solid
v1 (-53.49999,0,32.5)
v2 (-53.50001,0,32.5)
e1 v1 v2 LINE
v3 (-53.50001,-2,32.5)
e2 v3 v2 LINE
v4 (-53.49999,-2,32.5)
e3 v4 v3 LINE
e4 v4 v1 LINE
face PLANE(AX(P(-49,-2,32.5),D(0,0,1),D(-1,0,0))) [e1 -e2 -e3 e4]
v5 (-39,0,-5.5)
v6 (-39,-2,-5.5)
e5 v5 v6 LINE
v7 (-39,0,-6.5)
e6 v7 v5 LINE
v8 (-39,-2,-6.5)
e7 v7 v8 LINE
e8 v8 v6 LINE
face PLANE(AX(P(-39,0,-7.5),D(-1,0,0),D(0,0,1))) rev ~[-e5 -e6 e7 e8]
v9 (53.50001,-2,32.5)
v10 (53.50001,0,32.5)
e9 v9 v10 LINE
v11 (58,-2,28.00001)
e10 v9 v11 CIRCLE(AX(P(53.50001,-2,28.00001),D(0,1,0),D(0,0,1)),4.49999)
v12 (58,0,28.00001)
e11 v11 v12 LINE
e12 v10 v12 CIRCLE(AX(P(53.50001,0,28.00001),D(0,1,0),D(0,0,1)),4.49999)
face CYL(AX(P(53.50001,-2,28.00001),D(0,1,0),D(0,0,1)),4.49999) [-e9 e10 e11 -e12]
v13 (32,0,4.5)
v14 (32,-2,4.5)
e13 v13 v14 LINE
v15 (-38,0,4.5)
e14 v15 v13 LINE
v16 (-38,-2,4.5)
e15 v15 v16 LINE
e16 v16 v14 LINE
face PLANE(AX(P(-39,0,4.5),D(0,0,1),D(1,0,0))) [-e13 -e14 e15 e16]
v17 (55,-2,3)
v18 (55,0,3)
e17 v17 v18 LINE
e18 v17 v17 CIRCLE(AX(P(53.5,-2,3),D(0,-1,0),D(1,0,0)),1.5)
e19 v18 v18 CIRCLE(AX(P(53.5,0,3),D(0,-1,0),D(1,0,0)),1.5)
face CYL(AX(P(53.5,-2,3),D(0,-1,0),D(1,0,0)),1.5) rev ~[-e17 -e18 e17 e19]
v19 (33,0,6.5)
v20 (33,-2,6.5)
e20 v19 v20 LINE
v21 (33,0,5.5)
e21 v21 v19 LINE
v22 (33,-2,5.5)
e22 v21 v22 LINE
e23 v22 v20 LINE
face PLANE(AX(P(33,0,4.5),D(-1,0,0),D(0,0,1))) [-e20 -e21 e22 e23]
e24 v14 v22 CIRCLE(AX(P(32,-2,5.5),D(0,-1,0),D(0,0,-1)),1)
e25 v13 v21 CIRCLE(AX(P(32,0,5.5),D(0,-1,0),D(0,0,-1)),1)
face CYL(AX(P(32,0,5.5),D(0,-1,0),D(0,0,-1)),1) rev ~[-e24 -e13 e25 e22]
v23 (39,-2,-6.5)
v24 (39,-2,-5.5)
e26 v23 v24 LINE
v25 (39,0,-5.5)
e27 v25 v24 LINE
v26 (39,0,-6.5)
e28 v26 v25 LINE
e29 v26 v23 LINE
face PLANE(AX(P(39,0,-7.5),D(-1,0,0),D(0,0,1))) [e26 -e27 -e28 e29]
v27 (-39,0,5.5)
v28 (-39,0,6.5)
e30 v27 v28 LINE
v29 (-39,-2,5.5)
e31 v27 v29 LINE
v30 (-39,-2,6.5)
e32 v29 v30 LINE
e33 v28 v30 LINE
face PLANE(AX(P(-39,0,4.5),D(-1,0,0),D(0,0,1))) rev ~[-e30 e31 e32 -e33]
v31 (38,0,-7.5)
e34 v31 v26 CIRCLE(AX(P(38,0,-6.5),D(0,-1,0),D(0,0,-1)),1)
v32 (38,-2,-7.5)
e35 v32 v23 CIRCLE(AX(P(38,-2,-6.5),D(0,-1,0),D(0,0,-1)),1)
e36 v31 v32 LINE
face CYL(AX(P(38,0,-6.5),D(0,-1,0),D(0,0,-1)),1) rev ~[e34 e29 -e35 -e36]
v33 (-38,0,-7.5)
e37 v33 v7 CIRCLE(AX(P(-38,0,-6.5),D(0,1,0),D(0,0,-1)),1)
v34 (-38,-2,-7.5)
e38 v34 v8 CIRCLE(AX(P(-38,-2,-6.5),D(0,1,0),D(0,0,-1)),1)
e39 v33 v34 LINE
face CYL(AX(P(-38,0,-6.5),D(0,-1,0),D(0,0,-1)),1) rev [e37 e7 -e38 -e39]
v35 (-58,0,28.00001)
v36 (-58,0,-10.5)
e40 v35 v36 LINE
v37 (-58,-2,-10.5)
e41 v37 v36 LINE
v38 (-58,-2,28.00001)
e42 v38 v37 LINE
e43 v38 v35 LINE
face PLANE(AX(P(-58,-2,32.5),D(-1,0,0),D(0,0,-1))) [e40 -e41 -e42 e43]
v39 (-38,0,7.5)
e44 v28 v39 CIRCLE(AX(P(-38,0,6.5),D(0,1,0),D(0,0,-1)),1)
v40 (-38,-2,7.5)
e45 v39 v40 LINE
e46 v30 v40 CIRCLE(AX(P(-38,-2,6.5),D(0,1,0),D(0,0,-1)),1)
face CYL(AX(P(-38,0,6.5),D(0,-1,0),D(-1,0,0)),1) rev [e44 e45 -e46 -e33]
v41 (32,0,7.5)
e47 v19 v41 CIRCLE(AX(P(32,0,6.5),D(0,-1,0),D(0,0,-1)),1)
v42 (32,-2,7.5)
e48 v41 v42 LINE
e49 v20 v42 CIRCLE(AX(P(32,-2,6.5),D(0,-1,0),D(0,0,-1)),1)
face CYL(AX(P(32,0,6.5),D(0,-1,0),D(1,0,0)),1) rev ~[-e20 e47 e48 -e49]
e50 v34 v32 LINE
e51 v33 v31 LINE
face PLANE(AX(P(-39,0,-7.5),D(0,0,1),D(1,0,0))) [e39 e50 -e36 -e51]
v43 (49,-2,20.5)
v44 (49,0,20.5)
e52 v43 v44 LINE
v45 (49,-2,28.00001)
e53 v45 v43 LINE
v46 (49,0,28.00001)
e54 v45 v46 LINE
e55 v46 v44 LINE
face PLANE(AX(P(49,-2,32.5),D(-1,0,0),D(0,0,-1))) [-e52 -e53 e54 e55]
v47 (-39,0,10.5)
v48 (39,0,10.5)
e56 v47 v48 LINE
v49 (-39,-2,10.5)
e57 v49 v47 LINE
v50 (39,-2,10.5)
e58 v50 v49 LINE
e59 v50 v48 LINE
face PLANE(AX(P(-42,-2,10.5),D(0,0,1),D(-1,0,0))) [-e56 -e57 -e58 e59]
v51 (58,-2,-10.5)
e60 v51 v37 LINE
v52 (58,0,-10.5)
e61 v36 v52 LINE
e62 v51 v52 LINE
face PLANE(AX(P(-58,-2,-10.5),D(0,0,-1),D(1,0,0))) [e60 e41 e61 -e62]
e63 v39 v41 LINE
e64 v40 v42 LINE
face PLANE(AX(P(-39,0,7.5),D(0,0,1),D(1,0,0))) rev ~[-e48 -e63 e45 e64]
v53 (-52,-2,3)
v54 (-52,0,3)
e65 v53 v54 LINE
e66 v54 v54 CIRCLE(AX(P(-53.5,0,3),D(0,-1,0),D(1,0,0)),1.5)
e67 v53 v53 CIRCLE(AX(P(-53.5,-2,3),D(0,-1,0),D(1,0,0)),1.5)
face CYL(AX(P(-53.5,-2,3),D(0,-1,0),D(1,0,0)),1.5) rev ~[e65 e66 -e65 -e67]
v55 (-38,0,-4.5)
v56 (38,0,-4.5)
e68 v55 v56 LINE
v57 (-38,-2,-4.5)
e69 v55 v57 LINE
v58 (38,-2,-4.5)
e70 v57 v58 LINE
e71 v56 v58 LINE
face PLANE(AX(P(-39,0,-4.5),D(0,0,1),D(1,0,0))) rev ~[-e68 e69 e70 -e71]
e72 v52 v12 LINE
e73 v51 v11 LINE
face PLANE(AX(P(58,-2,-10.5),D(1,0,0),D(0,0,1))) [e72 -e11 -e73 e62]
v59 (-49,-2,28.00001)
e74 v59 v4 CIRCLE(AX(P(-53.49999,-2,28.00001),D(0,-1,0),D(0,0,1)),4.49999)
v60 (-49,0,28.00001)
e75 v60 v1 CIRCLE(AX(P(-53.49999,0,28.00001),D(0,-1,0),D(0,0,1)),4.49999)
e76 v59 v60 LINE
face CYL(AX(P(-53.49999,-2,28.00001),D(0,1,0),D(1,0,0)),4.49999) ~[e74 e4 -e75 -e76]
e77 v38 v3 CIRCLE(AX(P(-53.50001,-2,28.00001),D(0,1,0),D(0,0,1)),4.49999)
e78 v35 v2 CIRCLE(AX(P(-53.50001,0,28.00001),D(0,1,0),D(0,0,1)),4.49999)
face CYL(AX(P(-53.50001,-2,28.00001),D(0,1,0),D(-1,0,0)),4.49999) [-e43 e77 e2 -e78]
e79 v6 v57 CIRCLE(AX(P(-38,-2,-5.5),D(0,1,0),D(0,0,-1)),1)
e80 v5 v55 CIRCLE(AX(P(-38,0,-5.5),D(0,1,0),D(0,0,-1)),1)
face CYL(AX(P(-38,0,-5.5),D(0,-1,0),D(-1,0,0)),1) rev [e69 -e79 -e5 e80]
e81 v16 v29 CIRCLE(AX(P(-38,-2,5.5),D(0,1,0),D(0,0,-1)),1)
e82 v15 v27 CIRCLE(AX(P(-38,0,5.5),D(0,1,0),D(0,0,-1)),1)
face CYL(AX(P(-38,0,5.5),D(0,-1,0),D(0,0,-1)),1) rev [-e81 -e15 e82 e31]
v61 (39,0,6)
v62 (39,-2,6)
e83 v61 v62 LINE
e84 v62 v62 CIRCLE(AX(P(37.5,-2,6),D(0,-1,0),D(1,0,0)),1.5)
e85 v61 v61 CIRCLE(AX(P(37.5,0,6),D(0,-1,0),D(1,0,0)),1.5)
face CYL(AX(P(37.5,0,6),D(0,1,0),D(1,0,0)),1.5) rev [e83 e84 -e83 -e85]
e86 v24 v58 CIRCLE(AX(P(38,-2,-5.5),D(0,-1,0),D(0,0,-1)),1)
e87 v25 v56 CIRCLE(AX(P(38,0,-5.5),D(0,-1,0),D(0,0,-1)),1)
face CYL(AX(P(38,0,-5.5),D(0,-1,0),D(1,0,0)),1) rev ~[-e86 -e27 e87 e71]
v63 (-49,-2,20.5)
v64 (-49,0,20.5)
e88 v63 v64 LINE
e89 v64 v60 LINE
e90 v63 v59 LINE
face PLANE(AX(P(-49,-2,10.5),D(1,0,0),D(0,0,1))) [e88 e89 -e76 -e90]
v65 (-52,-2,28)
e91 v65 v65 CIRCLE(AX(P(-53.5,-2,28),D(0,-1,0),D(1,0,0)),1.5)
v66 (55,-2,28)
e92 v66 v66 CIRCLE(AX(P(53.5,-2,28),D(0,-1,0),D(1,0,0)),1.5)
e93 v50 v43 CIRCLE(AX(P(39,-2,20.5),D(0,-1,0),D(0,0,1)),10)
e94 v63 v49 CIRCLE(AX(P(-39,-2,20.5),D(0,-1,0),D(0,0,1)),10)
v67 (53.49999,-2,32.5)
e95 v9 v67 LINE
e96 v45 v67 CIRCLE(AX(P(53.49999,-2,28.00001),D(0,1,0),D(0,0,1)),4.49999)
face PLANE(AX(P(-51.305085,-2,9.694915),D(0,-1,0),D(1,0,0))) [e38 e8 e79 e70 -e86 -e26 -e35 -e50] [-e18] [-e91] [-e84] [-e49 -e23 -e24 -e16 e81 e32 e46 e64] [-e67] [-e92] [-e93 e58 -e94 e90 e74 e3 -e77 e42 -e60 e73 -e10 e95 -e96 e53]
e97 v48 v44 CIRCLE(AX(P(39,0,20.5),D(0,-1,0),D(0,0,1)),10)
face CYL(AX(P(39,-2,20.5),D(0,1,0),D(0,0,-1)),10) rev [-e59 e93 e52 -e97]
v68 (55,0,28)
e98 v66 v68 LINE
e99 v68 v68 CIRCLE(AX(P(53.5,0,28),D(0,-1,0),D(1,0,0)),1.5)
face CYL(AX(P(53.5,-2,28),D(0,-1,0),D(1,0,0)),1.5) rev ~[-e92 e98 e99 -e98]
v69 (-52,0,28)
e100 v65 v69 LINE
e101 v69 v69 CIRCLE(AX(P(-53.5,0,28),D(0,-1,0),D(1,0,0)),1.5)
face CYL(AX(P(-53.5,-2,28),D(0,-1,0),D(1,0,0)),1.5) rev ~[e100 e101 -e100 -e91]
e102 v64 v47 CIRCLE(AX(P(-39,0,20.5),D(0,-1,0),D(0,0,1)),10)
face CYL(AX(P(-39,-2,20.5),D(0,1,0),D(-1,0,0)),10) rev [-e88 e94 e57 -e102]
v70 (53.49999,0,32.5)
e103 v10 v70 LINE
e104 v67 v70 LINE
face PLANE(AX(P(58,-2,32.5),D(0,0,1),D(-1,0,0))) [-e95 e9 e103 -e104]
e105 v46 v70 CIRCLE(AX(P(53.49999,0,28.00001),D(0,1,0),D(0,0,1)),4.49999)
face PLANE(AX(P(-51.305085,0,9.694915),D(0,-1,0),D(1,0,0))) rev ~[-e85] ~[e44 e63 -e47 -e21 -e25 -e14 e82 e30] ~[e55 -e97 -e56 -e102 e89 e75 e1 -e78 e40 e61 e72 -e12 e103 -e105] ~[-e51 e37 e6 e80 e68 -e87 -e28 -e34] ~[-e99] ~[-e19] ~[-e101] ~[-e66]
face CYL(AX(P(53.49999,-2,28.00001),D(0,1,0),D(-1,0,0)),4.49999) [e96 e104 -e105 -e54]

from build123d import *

# Parameters (mm, degrees)
F0_W     = 84
F0_H     = 21
F0_W_2   = 78
F0_H_2   = 3
F0_W_3   = 72
F0_R     = 1.5
F1_DEPTH = 2
F2_R     = 1
F3_R     = 1.5
F4_DEPTH = 2
F5_R     = 10
F6_R     = 4.49999


# Not quite as in the source:
# - a fillet or chamfer is up to 0.001 mm smaller than in the source, because OpenCascade refuses the exact size


with BuildPart() as f1:
    # F0 (on Front) → F1 (new body)
    with BuildSketch(Plane.XZ):
        Rectangle(F0_W, F0_H)
        with Locations((0, -6)):
            Rectangle(F0_W_2, F0_H_2, mode=Mode.SUBTRACT)
        with Locations((-3, 6)):
            Rectangle(F0_W_3, F0_H_2, mode=Mode.SUBTRACT)
        with Locations((37.5, 6)):
            Circle(F0_R, mode=Mode.SUBTRACT)
    extrude(amount=F1_DEPTH)

    # F2
    f2_edges = [f1.edges().sort_by_distance(p)[0] for p in [
        (-39, -1, 7.5),
        (-39, -1, -4.5),
        (-39, -1, 4.5),
        (-39, -1, -7.5),
        (33, -1, 7.5),
        (39, -1, -4.5),
        (39, -1, -7.5),
        (33, -1, 4.5),
    ]]
    fillet(f2_edges, radius=F2_R)

    # F3 (on face) → F4 (join)
    with BuildSketch(Plane.XZ.offset(2)):
        Polygon((-42, -10.5), (-42, 0), (-42, 10.5), (-49, 10.5), (-49, 32.5), (-58, 32.5), (-58, -10.5), align=None)
        with Locations((-53.5, 3)):
            Circle(F3_R, mode=Mode.SUBTRACT)
        with Locations((-53.5, 28)):
            Circle(F3_R, mode=Mode.SUBTRACT)
        Polygon((42, 10.5), (42, 0), (42, -10.5), (58, -10.5), (58, 32.5), (49, 32.5), (49, 10.5), align=None)
        with Locations((53.5, 3)):
            Circle(F3_R, mode=Mode.SUBTRACT)
        with Locations((53.5, 28)):
            Circle(F3_R, mode=Mode.SUBTRACT)
    extrude(amount=-F4_DEPTH)

    # F5
    f5_edges = [f1.edges().sort_by_distance(p)[0] for p in [
        (-49, -1, 10.5),
        (49, -1, 10.5),
    ]]
    fillet(f5_edges, radius=F5_R)

    # F6 (radius 4.5 in the source; OpenCascade refuses exactly that, so slightly less here)
    f6_edges = [f1.edges().sort_by_distance(p)[0] for p in [
        (-49, -1, 32.5),
        (-58, -1, 32.5),
        (58, -1, 32.5),
        (49, -1, 32.5),
    ]]
    fillet(f6_edges, radius=F6_R)


solid = f1.part
